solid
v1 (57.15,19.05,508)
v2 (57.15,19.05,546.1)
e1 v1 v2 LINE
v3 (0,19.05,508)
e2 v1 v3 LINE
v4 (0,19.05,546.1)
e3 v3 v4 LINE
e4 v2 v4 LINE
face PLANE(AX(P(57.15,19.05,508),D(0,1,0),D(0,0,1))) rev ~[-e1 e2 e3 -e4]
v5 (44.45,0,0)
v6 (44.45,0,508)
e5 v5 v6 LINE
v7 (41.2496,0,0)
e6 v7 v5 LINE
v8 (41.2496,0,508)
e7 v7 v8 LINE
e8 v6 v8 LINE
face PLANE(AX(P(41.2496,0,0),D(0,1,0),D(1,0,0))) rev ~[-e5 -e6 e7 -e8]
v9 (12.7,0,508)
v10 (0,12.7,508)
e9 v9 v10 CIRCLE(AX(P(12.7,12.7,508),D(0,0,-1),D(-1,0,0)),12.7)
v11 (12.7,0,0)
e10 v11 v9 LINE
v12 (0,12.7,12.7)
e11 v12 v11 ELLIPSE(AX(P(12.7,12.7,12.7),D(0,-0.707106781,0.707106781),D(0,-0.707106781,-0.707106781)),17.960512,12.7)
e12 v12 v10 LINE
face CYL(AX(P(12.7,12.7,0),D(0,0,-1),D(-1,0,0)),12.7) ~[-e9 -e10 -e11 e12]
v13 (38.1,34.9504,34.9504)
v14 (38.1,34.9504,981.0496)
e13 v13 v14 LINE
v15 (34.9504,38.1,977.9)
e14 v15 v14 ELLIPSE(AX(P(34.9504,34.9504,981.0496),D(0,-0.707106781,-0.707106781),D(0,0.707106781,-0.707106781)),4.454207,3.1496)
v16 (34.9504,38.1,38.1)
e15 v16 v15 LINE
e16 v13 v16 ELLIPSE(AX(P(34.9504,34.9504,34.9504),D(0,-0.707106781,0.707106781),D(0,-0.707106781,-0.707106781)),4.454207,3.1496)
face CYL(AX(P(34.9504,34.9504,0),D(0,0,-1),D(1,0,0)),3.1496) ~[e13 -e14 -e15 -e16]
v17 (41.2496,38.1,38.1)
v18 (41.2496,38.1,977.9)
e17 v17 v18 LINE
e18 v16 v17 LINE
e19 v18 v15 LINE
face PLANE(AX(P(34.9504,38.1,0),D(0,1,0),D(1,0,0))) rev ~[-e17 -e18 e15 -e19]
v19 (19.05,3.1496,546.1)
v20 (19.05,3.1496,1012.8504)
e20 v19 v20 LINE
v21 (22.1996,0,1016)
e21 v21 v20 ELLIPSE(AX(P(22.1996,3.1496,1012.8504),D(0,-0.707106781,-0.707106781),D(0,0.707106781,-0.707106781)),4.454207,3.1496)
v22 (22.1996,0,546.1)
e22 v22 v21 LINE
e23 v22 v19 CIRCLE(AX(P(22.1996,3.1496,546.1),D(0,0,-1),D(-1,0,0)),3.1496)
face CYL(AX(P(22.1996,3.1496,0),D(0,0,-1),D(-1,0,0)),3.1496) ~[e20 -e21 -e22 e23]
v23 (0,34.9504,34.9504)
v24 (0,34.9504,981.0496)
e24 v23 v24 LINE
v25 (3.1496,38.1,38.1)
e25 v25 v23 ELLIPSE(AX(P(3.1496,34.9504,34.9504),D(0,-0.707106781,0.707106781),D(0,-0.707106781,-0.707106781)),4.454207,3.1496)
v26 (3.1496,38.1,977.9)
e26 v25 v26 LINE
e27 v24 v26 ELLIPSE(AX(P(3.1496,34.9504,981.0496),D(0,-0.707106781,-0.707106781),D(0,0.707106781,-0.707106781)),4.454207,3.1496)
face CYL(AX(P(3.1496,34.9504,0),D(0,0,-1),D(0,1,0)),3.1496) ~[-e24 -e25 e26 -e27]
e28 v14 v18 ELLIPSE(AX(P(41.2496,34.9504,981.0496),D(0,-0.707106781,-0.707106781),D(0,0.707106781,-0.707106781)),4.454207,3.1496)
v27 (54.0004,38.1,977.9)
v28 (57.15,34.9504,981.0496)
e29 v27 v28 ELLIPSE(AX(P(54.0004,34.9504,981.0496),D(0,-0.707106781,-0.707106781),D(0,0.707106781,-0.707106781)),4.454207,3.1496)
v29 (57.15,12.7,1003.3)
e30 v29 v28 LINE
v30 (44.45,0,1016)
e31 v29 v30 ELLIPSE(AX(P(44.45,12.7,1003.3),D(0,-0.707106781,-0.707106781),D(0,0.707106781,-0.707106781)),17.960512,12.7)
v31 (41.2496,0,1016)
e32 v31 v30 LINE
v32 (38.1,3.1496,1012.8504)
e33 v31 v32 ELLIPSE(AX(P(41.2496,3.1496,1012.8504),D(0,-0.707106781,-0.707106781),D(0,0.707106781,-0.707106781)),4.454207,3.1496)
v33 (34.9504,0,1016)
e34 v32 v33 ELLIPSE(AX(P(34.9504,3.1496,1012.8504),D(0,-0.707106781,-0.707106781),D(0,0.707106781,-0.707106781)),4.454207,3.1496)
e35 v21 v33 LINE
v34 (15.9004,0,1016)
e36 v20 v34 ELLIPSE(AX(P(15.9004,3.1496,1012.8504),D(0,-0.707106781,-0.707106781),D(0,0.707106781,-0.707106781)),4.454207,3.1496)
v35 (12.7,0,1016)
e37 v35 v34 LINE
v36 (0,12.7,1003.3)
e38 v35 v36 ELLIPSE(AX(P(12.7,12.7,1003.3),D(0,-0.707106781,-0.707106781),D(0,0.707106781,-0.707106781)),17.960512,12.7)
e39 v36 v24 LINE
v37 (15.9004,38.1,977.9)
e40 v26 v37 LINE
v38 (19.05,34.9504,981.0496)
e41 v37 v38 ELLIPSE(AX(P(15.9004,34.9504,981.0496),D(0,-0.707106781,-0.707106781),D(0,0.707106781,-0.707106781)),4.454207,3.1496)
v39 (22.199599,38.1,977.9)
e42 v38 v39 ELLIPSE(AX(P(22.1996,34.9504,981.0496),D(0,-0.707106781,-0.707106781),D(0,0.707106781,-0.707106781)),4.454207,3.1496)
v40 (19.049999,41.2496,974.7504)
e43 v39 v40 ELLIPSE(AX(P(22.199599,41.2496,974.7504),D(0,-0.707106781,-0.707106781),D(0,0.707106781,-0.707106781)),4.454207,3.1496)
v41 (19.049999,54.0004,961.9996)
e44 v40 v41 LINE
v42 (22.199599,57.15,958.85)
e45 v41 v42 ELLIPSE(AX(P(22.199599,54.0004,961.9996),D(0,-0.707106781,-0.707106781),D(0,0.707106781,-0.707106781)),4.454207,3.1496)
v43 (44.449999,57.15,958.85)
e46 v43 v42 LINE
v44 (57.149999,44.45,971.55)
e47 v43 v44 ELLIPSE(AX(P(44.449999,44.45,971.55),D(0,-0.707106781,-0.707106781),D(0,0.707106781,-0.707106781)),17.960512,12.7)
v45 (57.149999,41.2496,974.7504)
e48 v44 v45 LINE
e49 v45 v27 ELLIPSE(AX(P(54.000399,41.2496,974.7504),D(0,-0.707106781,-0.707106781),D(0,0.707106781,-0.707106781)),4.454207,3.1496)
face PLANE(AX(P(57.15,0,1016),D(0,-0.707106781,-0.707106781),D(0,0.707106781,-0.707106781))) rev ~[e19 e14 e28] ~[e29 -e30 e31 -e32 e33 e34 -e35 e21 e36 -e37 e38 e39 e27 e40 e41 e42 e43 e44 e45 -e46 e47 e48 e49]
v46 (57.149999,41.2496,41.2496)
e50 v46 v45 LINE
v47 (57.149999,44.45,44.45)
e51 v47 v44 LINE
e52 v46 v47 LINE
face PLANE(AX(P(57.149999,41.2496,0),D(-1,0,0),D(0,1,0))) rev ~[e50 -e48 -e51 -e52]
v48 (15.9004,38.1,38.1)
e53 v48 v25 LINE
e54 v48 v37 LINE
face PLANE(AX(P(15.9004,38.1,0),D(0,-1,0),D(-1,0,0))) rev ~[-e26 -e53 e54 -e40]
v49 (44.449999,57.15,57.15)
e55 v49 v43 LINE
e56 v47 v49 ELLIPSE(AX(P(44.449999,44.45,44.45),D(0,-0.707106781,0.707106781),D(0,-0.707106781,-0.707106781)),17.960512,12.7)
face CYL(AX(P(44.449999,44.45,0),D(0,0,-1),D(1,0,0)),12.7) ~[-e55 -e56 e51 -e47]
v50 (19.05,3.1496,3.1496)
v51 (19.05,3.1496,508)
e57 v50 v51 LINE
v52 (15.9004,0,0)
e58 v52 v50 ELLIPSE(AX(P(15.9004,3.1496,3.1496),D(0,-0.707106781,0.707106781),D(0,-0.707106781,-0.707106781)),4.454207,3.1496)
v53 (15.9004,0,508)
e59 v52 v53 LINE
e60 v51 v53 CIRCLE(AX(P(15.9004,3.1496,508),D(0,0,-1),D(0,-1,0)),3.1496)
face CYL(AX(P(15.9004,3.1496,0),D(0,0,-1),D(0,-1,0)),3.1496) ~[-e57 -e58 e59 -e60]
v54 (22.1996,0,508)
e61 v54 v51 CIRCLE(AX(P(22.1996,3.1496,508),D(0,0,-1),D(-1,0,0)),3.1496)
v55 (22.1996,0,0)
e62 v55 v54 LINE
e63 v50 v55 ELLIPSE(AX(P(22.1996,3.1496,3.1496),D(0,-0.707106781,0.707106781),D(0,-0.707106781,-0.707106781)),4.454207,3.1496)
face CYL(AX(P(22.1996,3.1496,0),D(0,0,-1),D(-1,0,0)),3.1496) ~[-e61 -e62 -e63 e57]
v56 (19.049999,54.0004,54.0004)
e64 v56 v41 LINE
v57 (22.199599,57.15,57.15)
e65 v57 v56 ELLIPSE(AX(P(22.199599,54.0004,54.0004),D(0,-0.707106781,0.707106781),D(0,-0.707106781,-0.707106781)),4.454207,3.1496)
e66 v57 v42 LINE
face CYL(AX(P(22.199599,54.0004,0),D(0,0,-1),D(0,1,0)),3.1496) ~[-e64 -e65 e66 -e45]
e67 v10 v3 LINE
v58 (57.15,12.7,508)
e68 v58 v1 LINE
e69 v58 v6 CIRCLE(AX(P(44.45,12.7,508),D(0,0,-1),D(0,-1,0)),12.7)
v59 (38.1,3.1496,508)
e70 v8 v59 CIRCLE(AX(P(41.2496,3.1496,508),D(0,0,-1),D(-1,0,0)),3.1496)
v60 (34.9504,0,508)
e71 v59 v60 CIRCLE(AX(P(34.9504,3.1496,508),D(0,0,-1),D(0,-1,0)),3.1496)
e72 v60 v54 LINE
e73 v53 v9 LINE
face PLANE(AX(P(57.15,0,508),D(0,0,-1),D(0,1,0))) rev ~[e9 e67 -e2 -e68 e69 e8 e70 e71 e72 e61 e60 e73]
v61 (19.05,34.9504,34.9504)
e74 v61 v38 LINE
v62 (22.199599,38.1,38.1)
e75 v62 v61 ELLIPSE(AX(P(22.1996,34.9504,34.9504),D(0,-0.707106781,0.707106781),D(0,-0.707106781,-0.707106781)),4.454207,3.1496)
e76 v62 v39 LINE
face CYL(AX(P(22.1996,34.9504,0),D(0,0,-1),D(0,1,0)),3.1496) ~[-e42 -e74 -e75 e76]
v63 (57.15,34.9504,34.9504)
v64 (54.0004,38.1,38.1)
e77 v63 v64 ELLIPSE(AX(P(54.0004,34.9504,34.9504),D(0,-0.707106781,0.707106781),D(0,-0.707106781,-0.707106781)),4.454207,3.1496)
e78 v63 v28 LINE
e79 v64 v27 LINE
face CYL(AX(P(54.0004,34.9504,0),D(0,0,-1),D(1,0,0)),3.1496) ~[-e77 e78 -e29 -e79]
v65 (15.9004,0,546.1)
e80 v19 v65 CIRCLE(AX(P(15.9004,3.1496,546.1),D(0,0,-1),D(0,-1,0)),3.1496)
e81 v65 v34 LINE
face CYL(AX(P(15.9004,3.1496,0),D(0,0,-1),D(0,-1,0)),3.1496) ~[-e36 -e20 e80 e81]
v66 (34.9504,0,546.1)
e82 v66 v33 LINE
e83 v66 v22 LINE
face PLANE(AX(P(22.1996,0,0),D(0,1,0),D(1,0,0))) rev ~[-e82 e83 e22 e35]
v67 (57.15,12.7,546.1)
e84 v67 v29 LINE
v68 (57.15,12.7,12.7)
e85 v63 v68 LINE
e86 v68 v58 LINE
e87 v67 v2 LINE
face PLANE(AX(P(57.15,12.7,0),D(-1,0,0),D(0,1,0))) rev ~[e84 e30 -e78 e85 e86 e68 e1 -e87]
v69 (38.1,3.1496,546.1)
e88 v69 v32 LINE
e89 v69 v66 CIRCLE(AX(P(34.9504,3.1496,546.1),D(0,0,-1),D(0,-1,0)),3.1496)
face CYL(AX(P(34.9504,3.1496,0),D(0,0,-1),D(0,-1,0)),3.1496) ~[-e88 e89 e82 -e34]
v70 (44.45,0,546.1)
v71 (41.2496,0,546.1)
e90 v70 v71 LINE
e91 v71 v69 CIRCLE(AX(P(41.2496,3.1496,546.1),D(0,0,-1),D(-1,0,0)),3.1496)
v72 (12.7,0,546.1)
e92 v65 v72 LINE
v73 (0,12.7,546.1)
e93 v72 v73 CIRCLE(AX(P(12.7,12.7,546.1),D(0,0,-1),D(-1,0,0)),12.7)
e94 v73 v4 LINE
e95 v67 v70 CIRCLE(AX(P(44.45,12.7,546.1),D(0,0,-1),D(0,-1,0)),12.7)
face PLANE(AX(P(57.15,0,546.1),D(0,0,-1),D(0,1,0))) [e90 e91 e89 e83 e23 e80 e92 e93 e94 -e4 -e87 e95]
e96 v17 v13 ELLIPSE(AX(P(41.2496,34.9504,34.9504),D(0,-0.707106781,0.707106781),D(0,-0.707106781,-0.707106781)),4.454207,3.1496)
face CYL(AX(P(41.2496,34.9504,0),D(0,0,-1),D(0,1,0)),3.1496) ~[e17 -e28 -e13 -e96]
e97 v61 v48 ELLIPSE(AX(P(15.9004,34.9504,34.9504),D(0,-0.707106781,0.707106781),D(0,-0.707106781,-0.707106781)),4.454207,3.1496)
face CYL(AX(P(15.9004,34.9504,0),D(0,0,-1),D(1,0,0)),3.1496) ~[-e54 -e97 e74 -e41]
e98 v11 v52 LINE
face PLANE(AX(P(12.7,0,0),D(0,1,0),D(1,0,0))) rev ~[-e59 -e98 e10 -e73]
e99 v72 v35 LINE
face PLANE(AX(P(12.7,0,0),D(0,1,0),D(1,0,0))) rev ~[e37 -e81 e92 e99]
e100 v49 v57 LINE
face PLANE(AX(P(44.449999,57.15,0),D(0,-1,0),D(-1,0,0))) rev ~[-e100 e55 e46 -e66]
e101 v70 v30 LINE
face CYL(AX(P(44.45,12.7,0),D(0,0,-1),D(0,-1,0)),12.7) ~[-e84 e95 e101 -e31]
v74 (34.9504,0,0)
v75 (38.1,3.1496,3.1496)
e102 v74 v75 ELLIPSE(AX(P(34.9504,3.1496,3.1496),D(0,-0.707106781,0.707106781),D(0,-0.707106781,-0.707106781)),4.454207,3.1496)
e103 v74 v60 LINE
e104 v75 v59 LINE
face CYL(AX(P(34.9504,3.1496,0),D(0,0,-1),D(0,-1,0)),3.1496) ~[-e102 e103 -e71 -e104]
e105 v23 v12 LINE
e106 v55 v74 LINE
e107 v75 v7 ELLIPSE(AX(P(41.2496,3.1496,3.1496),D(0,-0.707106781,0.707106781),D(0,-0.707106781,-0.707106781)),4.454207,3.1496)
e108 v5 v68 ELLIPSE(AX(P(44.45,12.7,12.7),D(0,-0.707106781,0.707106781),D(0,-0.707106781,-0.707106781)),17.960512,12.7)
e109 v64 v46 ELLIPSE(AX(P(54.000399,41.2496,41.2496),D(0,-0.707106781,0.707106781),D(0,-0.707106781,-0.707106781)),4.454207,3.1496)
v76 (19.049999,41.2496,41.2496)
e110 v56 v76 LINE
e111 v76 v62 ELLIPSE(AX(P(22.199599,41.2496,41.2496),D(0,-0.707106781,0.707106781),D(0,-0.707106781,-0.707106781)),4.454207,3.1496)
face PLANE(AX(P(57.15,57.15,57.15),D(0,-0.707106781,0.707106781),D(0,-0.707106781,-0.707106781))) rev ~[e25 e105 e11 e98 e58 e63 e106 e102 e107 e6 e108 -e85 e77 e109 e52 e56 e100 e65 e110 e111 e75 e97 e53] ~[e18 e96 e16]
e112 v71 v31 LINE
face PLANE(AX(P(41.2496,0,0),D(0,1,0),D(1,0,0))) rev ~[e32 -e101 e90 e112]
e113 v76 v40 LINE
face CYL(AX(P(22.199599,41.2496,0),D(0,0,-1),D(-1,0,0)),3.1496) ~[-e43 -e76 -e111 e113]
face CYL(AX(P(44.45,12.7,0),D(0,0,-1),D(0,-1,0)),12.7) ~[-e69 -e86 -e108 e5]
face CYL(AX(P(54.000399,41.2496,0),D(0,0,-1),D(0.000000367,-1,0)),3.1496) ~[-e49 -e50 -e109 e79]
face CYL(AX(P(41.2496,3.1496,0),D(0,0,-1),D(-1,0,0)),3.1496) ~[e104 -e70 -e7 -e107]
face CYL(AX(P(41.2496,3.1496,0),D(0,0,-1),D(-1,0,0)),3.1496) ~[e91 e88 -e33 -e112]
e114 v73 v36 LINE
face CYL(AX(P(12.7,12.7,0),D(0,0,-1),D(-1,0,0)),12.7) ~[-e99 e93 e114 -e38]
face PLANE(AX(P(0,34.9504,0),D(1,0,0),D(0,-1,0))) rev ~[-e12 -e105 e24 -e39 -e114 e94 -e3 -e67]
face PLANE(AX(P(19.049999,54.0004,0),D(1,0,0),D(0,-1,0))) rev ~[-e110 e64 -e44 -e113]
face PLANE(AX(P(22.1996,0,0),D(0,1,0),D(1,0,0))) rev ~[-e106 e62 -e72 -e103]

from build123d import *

# Parameters (mm, degrees)
F1_DEPTH = 1016
F3_DEPTH = 57.151
F4_W     = 19.05
F4_H     = 38.1
F5_DEPTH = 57.151


# Not quite as in the source:
# - ends of sketch curves that miss each other by under 0.0002 mm in the source are joined


with BuildPart() as f1:
    # F0 (on Top) → F1 (new body)
    with BuildSketch(Plane.XY):
        with BuildLine():
            ThreePointArc((0, 12.7), (3.7197438789, 3.7197438789), (12.7, 0))
            Line((12.7, 0), (15.9004, 0))
            ThreePointArc((15.9004, 0), (18.127503518, 0.922496482), (19.05, 3.1496))
            Line((19.05, 3.1496), (19.05, 34.9504))
            ThreePointArc((19.05, 34.9504), (18.127503518, 37.177503518), (15.9004, 38.1))
            Line((15.9004, 38.1), (3.1496, 38.1))
            ThreePointArc((3.1496, 38.1), (0.922496482, 37.177503518), (0, 34.9504))
            Line((0, 34.9504), (0, 12.7))
        make_face()
        with BuildLine():
            Line((19.05, 34.9504), (19.05, 3.1496))
            ThreePointArc((19.05, 3.1496), (19.972496482, 0.922496482), (22.1996, 0))
            Line((22.1996, 0), (34.9504, 0))
            ThreePointArc((34.9504, 0), (37.177503518, 0.922496482), (38.1, 3.1496))
            Line((38.1, 3.1496), (38.1, 34.9504))
            ThreePointArc((38.1, 34.9504), (37.177503518, 37.177503518), (34.9504, 38.1))
            Line((34.9504, 38.1), (22.1996, 38.1))
            ThreePointArc((22.1996, 38.1), (19.972496482, 37.177503518), (19.05, 34.9504))
        make_face()
        with BuildLine():
            Line((38.1, 34.9504), (38.1, 3.1496))
            ThreePointArc((38.1, 3.1496), (39.022496482, 0.922496482), (41.2496, 0))
            Line((41.2496, 0), (44.45, 0))
            ThreePointArc((44.45, 0), (53.4302561211, 3.7197438789), (57.15, 12.7))
            Line((57.15, 12.7), (57.15, 34.9504))
            ThreePointArc((57.15, 34.9504), (56.227503518, 37.177503518), (54.0004, 38.1))
            Line((54.0004, 38.1), (41.2496, 38.1))
            ThreePointArc((41.2496, 38.1), (39.022496482, 37.177503518), (38.1, 34.9504))
        make_face()
        with BuildLine():
            ThreePointArc((19.0499988437, 41.2496), (19.9724953256, 39.022496482), (22.1995988437, 38.1))
            Line((22.1995988437, 38.1), (34.9504, 38.1))
            Line((34.9504, 38.1), (41.2496, 38.1))
            Line((41.2496, 38.1), (54.0004, 38.1))
            ThreePointArc((54.0004, 38.1), (56.2275023617, 39.022496482), (57.1499988437, 41.2496))
            Line((57.1499988437, 41.2496), (57.1499988437, 44.45))
            ThreePointArc((57.1499988437, 44.45), (53.4302549647, 53.4302561211), (44.4499988437, 57.15))
            Line((44.4499988437, 57.15), (22.1995988437, 57.15))
            ThreePointArc((22.1995988437, 57.15), (19.9724953256, 56.227503518), (19.0499988437, 54.0004))
            Line((19.0499988437, 54.0004), (19.0499988437, 41.2496))
        make_face()
    extrude(amount=F1_DEPTH)

    # F2 (on face) → F3 (cut, through all)
    with BuildSketch(Plane.YZ.offset(57.15)):
        Polygon((57.15, 0), (57.15, 57.15), (0, 0), (12.7, 0), align=None)
        Polygon((12.7, 1016), (0, 1016), (57.15, 958.85), (57.15, 1016), align=None)
    extrude(amount=-F3_DEPTH, mode=Mode.SUBTRACT)

    # F4 (on face) → F5 (cut, through all)
    with BuildSketch(Plane.YZ.offset(57.15)):
        with Locations((9.525, 527.05)):
            Rectangle(F4_W, F4_H)
    extrude(amount=-F5_DEPTH, mode=Mode.SUBTRACT)


solid = f1.part
